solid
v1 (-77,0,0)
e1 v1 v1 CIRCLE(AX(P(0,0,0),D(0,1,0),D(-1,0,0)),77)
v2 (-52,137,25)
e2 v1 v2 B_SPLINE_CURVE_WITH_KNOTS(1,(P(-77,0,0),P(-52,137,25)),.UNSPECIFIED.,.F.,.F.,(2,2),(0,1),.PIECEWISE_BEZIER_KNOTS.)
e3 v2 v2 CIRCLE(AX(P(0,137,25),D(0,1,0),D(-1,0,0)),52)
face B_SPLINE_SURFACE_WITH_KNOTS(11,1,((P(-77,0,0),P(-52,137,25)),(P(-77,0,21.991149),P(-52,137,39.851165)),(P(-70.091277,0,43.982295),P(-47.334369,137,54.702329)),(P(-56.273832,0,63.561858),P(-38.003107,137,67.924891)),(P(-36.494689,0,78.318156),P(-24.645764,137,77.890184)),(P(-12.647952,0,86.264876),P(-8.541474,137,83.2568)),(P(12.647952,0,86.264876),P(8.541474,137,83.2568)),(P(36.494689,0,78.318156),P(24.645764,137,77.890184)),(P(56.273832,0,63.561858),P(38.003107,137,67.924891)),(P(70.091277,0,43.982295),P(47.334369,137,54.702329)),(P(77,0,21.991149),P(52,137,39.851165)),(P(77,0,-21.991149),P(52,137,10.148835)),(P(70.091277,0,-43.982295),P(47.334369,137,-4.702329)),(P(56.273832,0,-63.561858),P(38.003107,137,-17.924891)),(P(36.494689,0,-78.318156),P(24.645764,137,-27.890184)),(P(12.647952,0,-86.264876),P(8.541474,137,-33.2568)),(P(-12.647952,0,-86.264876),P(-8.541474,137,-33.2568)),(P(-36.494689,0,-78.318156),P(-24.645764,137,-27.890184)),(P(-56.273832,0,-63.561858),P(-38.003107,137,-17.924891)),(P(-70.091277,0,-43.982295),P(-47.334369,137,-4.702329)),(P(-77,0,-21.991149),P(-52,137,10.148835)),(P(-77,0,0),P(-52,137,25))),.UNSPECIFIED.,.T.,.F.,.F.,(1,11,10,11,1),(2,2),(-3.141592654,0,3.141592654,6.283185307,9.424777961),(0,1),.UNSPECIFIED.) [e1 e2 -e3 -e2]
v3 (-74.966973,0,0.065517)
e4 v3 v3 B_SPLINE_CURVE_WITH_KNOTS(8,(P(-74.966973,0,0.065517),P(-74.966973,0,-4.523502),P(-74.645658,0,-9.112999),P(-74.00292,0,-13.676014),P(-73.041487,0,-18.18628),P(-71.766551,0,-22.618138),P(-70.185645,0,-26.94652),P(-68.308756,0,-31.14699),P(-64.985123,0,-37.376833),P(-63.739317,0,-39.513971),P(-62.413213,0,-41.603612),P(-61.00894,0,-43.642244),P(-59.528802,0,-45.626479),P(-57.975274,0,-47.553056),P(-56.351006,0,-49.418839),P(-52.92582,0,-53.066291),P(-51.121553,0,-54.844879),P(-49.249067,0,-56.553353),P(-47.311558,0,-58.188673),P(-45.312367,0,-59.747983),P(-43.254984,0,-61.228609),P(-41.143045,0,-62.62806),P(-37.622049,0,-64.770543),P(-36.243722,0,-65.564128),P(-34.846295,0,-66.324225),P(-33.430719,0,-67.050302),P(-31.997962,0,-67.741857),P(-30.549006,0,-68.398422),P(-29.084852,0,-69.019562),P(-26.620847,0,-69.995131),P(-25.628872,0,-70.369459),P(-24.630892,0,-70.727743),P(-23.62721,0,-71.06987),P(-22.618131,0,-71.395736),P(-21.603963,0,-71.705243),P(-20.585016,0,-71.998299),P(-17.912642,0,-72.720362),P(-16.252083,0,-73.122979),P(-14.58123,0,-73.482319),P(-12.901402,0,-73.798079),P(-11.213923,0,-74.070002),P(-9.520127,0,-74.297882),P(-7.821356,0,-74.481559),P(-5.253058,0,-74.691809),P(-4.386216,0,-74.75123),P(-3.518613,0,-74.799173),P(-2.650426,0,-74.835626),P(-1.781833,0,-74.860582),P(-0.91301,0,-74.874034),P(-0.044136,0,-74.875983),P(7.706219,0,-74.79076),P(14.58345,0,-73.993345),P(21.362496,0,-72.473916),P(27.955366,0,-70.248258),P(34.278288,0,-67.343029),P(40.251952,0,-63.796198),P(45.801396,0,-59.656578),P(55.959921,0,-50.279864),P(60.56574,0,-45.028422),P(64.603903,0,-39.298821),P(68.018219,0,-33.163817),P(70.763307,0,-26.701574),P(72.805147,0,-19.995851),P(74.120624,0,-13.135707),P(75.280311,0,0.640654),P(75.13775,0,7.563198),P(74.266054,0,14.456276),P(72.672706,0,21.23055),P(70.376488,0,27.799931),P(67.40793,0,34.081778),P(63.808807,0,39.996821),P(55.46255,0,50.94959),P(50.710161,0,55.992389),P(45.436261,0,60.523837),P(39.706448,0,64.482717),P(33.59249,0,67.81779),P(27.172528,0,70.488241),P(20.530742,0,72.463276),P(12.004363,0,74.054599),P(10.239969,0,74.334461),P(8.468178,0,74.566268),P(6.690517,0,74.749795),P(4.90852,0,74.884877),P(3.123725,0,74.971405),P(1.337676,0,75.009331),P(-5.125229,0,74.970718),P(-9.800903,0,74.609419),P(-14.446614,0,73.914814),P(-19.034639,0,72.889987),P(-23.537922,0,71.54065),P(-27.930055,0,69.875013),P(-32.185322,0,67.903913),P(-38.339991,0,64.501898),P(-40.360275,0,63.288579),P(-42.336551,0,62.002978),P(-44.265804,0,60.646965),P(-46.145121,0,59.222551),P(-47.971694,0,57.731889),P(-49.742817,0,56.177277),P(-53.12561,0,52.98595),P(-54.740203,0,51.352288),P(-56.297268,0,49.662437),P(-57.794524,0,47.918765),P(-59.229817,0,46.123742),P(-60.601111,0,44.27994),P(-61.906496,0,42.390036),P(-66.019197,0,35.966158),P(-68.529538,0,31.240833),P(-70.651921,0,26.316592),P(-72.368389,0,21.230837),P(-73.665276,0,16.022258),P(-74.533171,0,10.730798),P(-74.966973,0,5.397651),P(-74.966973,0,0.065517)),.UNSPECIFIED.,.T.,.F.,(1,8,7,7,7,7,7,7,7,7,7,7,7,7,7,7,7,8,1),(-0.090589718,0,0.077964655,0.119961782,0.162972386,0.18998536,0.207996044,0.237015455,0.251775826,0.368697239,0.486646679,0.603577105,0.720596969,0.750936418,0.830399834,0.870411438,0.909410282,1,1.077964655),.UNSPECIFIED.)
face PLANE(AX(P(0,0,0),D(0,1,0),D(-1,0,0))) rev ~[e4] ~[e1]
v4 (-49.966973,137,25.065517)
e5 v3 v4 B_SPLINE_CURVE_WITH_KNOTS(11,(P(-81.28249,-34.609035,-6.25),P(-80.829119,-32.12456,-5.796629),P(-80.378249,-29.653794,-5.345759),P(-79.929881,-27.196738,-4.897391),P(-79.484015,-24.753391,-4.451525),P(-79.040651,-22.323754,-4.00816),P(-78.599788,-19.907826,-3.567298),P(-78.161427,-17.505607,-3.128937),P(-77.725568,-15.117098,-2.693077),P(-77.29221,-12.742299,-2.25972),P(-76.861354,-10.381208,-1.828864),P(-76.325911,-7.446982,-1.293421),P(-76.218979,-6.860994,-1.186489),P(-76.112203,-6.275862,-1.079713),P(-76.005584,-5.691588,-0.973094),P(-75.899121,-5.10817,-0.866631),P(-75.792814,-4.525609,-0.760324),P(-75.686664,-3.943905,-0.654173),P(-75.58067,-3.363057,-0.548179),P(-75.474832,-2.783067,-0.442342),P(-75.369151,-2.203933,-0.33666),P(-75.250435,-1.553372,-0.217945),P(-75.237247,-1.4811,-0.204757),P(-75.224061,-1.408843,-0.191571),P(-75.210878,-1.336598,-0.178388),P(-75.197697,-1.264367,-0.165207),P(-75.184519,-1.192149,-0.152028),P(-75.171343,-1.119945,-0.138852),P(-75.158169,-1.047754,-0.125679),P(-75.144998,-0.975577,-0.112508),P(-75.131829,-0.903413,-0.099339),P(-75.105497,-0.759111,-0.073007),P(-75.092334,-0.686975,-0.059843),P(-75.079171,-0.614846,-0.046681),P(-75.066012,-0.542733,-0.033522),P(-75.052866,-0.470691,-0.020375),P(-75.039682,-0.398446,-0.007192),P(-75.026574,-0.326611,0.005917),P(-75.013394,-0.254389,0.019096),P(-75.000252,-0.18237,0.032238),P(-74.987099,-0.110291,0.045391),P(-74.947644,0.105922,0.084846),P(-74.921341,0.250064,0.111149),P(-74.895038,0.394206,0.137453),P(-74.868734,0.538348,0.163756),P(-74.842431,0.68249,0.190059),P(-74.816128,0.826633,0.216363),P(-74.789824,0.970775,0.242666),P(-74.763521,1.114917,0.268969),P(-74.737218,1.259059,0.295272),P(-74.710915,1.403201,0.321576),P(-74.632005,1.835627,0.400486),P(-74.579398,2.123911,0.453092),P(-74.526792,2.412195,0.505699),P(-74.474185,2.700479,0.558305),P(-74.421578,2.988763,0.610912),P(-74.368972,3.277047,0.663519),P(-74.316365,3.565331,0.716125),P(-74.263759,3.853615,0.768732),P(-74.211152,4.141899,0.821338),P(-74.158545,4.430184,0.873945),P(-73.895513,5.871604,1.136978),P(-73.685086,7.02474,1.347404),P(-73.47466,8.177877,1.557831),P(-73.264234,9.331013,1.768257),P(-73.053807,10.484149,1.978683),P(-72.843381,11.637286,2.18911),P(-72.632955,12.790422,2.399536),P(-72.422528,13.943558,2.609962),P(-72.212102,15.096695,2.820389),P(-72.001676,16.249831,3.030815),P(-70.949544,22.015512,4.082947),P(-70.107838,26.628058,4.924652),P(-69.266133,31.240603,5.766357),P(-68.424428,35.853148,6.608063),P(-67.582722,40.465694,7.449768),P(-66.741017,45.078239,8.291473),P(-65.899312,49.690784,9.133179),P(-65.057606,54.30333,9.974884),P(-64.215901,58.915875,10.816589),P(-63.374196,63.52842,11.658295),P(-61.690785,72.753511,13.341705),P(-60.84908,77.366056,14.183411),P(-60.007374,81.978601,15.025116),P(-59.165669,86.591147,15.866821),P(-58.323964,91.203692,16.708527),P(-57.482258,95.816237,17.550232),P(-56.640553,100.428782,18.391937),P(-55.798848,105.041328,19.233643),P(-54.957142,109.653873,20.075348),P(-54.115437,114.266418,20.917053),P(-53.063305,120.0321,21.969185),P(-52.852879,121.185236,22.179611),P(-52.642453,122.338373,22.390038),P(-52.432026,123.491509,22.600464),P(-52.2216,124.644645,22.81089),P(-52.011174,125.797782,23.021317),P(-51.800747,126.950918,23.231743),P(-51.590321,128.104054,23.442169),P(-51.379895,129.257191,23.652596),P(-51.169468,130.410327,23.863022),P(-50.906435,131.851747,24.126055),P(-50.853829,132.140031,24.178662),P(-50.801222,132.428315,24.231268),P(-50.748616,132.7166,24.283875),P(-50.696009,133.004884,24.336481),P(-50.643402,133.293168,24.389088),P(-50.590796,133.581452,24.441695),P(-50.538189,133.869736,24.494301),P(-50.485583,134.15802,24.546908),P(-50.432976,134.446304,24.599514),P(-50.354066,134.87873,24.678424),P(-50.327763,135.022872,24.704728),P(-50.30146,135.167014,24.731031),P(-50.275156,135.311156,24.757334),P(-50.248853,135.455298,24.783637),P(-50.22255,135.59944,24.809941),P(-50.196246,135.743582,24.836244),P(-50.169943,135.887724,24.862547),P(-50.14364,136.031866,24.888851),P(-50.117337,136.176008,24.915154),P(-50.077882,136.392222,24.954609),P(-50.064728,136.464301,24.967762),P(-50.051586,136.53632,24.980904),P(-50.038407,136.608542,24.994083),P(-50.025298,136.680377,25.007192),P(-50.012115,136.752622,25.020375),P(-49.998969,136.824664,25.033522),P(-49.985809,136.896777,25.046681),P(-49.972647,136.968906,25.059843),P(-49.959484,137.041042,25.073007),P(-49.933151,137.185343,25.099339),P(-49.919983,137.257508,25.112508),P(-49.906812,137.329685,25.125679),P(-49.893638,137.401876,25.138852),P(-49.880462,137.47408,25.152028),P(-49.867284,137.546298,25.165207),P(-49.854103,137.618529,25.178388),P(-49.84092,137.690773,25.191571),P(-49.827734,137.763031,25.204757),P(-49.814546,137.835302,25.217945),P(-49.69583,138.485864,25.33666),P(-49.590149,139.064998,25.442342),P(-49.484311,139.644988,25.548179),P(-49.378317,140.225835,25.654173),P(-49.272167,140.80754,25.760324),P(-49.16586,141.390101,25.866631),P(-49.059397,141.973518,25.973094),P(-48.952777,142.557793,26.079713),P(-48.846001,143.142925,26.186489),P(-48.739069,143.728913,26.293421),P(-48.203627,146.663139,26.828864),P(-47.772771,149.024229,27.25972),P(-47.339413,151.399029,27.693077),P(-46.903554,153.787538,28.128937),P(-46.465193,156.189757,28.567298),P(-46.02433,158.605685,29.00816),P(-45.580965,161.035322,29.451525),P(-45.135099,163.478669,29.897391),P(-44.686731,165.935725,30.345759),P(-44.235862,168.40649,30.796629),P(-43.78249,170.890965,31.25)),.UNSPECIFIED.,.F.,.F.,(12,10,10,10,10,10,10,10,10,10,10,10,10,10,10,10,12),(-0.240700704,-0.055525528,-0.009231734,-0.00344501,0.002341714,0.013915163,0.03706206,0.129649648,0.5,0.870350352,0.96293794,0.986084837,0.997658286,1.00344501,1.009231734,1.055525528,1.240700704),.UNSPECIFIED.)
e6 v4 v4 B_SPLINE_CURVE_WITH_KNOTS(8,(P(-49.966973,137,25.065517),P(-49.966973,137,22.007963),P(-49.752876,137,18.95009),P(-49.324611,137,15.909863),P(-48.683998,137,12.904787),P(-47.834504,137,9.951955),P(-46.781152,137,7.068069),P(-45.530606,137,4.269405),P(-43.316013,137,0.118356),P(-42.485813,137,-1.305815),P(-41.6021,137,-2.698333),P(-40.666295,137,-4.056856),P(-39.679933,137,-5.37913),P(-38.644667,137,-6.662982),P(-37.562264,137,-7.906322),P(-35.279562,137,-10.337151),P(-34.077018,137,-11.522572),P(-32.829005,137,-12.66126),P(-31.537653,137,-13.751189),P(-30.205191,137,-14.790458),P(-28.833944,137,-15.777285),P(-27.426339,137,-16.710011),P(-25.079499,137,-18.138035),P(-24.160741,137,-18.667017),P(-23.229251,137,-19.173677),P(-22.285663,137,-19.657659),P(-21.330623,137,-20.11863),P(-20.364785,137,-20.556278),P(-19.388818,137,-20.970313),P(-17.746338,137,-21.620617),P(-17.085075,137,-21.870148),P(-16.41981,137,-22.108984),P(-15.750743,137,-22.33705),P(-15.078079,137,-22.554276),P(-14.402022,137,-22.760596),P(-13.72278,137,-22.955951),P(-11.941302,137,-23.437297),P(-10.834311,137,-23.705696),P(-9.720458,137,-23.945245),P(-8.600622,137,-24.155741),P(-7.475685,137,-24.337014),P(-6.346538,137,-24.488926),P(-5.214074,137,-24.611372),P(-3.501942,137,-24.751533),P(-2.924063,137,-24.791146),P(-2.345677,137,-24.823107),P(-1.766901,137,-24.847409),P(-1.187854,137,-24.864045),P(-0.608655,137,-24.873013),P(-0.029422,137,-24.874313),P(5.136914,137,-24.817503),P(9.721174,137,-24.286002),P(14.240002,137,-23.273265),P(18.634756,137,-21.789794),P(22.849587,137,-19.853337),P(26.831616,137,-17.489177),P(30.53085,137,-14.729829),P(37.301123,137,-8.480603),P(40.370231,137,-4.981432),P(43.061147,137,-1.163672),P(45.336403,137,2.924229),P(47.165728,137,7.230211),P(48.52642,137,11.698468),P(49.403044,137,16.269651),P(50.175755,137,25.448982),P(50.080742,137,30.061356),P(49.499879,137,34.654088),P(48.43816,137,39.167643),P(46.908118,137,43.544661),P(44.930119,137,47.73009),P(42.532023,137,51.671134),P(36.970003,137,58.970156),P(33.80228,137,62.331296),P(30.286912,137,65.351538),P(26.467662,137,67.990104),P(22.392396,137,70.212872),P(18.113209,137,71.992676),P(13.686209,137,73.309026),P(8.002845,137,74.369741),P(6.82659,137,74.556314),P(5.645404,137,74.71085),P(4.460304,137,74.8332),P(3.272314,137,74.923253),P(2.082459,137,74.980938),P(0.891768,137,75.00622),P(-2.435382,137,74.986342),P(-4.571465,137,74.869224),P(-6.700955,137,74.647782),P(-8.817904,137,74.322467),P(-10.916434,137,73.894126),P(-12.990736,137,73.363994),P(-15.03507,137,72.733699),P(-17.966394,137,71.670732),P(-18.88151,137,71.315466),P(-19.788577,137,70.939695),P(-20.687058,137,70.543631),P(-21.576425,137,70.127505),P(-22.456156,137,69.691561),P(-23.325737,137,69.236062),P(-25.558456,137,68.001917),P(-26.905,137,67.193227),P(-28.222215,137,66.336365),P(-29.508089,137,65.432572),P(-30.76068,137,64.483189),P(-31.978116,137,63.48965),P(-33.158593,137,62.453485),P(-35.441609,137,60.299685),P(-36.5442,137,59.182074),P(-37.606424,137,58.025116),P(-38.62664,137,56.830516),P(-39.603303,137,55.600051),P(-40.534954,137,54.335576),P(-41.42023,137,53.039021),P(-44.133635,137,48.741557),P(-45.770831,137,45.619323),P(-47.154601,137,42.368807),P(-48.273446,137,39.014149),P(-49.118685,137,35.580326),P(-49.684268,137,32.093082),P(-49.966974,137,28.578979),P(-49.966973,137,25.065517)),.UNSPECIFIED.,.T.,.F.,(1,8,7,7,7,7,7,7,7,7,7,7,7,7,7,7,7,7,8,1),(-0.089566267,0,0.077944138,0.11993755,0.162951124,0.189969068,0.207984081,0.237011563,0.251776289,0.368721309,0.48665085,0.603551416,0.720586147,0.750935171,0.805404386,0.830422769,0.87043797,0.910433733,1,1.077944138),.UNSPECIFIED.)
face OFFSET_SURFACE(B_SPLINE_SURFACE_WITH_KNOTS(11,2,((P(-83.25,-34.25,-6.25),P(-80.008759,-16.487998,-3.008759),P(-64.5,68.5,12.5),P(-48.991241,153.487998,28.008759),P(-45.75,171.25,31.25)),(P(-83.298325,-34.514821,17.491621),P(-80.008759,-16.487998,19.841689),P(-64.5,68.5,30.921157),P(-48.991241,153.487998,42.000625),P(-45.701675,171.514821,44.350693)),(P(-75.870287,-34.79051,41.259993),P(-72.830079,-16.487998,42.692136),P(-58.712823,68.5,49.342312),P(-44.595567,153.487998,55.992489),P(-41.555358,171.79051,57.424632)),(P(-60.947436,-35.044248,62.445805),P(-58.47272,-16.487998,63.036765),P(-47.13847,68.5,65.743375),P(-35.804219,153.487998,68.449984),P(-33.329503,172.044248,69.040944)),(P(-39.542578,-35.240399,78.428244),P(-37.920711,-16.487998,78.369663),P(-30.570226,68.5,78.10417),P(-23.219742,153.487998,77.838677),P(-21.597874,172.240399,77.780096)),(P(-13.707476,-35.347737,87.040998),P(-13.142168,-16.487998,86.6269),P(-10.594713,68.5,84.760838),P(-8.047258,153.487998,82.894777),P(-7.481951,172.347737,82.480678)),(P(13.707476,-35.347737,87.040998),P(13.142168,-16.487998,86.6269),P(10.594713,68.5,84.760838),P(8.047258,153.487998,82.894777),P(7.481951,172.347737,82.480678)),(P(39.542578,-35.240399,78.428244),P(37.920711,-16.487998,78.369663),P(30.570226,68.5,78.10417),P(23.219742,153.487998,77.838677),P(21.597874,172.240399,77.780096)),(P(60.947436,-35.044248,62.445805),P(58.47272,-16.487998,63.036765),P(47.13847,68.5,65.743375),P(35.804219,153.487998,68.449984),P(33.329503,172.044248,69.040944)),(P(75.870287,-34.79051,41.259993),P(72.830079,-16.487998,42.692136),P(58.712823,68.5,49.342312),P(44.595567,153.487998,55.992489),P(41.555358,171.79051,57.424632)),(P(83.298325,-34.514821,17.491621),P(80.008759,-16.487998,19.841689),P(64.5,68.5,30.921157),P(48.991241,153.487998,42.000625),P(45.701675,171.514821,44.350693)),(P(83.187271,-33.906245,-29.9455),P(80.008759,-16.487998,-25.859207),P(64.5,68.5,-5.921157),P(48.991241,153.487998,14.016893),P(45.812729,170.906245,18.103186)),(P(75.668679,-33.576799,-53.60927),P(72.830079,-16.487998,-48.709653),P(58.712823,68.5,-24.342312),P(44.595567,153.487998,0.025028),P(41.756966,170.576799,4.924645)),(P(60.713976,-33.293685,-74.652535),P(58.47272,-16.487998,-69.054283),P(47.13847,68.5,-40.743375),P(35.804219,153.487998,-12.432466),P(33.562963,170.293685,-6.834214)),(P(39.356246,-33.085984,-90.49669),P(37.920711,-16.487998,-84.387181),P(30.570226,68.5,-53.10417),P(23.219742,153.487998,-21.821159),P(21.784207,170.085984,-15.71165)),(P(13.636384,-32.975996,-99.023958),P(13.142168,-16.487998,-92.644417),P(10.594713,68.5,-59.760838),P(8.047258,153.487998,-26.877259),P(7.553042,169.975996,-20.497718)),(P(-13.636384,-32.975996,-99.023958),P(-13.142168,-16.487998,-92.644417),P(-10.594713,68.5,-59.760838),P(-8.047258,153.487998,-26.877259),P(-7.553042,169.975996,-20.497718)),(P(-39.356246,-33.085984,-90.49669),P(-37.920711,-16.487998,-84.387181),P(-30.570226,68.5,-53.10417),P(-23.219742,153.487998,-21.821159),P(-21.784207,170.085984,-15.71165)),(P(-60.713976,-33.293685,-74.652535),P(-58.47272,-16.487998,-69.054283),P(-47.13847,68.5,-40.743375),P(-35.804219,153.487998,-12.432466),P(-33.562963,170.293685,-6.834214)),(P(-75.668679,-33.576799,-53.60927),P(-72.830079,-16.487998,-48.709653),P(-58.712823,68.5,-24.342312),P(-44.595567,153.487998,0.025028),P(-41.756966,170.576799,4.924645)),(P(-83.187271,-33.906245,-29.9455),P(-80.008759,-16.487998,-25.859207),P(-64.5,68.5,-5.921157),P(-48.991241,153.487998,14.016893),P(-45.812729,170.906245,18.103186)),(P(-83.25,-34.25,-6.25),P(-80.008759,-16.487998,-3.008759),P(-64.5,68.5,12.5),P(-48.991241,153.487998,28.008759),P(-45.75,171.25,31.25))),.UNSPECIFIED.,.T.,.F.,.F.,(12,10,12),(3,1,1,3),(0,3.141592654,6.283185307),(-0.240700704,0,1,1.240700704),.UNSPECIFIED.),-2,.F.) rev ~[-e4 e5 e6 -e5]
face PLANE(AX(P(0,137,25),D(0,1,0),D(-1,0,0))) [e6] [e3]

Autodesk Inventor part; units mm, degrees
ref_plane "YZ Plane" through (0, 0, 0) normal (1, 0, 0) x (0, 1, 0)
ref_plane "XY Plane" through (0, 0, 0) normal (0, 0, 1) x (1, 0, 0)
sketch "Szkic6" plane through (0, 0, 0) normal (0, 1, 0) x (-1, 0, 0)
  circle A0 centre (0, 0) radius 77
  dimension "d33" = 154
ref_plane "Płaszczyzna konstrukcyjna1" through (0, 137, 0) normal (0, 1, 0) x (-1, 0, 0)
sketch "Szkic7" plane through (0, 137, 0) normal (0, 1, 0) x (-1, 0, 0)
  circle A0 centre (0, 25) radius 52
  line L0 (0, -20.3) -> (0, 20.3) construction
  circle A1 centre (0, 0) radius 77 construction
  dimension "d35" = 104
loft "Wyciągnięcie złożone1" add profiles "Szkic6", "Szkic7"
shell "Skorupa1" thickness 2 removed faces 2 at (13.236, 137, 12.6822) at (-23.2587, 0, 21.3864)
equation "\"d33\" = OD1"
equation "\"d35\" = OD2"
equation "\"d52\" = THK"
equation "\"SzerokośćGięciaPodcięcia\" = Grubość"
equation "\"RozmiarPodcięciaNarożnika\" = 4 * Grubość"
equation "\"PromieńPrzejścia\" = PromieńGięcia"
equation "\"Rozmiar_promienia_Jacobiego\" = PromieńGięcia"
equation "\"Wielk_odstępu\" = Grubość"
equation "\"d2\" = PromieńGięcia"
equation "\"d23\" = PromieńGięcia"
equation "\"OD1\" = 154"
equation "\"OD2\" = 104"
equation "\"L\" = 137"
equation "\"THK\" = 2"
equation "\"d34\" = L"
equation "\"Grubość\" = 1.5"
equation "\"PromieńGięcia\" = 3"
properties part number "Redukcja asymetryczna Ø154x104x2 L=137" material "304"
